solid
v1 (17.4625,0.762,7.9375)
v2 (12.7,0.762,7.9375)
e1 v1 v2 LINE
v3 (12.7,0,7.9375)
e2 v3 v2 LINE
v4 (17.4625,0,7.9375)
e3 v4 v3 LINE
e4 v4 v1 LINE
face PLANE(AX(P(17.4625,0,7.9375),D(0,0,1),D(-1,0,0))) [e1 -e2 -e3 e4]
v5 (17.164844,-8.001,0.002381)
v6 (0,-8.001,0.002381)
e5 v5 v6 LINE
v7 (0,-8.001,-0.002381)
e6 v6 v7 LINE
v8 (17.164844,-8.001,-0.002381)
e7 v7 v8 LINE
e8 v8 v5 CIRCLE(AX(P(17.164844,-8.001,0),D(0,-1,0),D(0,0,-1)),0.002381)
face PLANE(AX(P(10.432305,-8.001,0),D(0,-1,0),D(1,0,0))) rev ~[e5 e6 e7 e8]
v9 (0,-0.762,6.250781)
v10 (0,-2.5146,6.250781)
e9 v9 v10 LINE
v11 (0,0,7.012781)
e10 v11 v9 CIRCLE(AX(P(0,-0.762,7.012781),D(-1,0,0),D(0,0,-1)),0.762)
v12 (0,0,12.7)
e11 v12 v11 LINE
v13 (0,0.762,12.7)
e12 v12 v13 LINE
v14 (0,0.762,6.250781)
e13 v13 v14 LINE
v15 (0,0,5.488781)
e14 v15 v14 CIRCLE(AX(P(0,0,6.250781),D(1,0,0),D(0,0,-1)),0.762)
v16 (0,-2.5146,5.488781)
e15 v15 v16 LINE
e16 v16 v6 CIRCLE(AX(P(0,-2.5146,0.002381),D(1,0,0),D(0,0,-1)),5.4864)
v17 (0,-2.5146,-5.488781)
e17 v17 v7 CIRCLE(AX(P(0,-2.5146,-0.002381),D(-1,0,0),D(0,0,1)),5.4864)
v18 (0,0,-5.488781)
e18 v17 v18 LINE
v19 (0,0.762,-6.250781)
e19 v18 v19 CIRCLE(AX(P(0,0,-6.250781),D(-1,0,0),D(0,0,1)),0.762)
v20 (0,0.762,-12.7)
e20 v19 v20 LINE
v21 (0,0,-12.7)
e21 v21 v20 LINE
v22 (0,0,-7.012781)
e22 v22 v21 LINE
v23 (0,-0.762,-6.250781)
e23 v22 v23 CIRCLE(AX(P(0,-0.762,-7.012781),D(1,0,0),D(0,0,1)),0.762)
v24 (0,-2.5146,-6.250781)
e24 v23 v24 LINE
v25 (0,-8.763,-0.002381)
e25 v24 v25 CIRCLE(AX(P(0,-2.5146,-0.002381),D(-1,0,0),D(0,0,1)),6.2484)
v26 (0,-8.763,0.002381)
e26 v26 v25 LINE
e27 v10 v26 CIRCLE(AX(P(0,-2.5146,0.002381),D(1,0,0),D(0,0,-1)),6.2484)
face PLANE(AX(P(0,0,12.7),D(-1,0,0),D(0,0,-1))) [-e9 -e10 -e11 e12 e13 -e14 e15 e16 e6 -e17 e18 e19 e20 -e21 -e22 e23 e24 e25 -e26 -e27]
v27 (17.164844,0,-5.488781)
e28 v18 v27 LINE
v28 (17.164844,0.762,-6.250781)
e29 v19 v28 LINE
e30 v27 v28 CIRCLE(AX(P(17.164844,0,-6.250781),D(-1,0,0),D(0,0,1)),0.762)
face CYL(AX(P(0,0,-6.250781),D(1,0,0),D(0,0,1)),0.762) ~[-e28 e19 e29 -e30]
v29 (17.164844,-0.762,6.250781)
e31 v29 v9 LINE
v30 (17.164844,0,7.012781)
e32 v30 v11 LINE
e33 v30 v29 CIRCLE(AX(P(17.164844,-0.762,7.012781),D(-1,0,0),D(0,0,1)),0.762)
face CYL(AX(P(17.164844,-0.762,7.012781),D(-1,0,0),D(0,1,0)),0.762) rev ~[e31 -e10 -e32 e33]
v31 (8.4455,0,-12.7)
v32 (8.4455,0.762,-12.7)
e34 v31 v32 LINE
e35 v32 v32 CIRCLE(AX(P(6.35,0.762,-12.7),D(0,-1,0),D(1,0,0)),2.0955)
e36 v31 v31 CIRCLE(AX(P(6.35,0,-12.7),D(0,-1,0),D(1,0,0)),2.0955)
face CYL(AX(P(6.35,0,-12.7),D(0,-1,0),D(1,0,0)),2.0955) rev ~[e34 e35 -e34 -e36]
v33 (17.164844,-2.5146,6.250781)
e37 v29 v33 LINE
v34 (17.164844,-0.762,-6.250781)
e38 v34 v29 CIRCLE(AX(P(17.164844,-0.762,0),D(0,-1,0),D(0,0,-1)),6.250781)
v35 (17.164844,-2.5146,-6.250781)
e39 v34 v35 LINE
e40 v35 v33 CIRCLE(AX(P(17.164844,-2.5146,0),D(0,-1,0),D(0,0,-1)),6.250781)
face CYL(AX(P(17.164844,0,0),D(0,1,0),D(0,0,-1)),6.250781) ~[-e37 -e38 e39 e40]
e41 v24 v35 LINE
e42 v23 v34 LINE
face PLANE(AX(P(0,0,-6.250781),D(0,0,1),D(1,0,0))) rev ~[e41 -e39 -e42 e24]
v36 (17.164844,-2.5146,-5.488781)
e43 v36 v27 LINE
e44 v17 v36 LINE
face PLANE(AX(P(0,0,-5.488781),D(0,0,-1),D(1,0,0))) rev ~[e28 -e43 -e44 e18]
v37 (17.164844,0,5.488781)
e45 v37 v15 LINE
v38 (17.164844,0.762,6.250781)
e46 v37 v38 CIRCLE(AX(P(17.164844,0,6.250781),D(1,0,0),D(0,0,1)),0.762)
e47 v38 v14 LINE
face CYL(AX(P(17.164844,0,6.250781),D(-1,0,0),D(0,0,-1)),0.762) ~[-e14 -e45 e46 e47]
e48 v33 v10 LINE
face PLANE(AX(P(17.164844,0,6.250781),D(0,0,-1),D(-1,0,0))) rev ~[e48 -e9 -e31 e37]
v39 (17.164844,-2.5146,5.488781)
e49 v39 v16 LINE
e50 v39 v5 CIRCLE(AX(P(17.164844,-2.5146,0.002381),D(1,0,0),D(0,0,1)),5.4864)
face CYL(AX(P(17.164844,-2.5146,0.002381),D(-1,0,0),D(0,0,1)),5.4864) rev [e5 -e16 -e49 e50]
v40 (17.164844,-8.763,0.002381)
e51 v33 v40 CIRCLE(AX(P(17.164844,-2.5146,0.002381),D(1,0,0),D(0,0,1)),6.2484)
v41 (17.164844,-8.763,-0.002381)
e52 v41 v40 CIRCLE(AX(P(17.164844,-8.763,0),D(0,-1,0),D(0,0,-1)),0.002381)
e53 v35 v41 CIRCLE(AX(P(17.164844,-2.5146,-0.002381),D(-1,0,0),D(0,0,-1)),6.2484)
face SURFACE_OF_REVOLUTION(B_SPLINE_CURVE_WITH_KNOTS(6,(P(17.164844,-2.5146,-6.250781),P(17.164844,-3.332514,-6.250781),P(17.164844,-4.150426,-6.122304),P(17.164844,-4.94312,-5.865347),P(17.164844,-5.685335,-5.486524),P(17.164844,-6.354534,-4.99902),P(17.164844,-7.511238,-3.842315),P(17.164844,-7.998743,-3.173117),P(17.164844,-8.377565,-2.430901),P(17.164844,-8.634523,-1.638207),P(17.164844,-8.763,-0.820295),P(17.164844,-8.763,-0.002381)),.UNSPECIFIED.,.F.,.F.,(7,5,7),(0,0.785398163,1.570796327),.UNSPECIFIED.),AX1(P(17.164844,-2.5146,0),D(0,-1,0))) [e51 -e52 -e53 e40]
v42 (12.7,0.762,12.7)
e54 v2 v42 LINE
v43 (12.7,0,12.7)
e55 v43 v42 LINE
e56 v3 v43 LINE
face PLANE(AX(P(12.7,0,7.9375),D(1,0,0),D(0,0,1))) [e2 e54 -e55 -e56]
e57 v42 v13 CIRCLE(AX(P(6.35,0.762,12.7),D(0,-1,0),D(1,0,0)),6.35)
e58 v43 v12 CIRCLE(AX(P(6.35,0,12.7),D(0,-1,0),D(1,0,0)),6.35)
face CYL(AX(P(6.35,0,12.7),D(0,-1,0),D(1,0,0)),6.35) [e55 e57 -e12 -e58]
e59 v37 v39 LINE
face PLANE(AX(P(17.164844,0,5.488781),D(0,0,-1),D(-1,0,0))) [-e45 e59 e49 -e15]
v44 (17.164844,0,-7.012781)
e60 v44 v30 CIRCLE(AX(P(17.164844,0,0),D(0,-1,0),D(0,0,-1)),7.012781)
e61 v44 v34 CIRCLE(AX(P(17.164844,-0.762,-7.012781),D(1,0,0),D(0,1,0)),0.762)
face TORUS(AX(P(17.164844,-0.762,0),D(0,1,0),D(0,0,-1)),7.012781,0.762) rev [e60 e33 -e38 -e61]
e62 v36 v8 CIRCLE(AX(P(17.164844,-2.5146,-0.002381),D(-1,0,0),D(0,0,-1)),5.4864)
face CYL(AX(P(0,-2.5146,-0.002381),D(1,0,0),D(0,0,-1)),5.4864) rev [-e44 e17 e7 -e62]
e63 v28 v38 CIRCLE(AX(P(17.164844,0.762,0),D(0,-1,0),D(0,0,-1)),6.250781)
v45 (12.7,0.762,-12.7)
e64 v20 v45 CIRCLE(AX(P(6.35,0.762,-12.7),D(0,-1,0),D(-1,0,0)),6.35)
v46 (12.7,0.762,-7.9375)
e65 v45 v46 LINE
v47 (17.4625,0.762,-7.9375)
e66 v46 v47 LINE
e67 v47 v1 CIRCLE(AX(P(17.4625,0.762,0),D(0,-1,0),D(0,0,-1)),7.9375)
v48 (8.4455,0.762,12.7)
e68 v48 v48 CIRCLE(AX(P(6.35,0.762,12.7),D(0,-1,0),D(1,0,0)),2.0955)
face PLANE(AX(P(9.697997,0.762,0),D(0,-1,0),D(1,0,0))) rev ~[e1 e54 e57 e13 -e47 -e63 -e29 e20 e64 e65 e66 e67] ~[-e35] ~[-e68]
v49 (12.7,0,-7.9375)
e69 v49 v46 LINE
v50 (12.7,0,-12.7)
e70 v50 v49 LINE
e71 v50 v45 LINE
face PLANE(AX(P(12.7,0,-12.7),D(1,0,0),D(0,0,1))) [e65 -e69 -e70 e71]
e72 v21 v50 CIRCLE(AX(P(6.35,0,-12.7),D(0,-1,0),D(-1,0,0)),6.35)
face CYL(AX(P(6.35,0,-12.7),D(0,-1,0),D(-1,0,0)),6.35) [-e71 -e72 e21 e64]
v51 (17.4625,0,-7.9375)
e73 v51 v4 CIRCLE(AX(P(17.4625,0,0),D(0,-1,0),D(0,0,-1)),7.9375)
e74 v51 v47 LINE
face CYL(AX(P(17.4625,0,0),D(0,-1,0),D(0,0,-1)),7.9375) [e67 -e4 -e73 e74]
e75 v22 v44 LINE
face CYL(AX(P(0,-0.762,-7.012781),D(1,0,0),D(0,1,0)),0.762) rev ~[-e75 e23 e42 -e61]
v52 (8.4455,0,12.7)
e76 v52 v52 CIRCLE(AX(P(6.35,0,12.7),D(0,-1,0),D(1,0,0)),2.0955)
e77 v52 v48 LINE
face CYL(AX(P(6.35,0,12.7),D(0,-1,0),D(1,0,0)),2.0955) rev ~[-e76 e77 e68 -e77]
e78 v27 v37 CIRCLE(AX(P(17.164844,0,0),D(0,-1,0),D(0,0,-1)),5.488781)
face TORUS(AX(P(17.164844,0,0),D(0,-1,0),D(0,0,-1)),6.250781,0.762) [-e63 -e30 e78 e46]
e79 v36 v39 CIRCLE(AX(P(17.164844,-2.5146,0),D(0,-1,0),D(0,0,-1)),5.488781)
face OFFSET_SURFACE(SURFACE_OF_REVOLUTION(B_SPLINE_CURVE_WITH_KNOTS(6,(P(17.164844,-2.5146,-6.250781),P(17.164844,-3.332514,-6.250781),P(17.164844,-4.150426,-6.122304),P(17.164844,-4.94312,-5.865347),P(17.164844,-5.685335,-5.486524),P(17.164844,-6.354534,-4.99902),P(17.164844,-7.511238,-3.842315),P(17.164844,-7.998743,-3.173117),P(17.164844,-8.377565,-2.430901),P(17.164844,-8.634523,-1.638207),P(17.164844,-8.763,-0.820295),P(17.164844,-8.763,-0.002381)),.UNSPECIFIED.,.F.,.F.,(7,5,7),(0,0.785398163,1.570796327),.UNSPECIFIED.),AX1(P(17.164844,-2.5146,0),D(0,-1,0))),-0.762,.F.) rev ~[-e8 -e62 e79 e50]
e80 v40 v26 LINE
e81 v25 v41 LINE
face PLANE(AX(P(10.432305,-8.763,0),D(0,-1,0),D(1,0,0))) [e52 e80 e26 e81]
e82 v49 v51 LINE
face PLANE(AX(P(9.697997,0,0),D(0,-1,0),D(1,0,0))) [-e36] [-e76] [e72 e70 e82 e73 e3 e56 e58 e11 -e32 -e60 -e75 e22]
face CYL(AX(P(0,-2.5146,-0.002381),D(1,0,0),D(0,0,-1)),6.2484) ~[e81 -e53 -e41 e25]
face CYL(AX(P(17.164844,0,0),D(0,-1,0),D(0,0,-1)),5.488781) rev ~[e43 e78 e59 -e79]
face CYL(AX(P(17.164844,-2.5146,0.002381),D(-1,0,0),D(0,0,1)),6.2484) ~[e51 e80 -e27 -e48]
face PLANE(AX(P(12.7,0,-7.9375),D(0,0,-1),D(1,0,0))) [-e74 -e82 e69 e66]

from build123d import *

# Parameters (mm, degrees)
F1_DEPTH    = 0.762
F3_DEPTH    = 8.763
F4_R        = 6.2484
F5_R        = 2.0955
F6_DEPTH    = 0.763
F7_T        = 0.762
F7_T3_DEPTH = 18.68884375
F7_T5_DEPTH = 2.286
F7_T8_ANGLE = 180.000000001
F8_DEPTH    = 0.763
F9_R        = 0.762


# Not quite as in the source:
# - a shell that OpenCascade refuses in one call is made with other operations: the cavity is built on its own and cut out


with BuildPart() as f1:
    # F0 (on Front) → F1 (new body)
    with BuildSketch(Plane.XZ):
        with BuildLine():
            ThreePointArc((12.7, 12.7), (6.35, 19.05), (0, 12.7))
            Line((0, 12.7), (0, -12.7))
            ThreePointArc((0, -12.7), (6.35, -19.05), (12.7, -12.7))
            Line((12.7, -12.7), (12.7, -7.9375))
            Line((12.7, -7.9375), (17.4625, -7.9375))
            ThreePointArc((17.4625, -7.9375), (25.4, 0), (17.4625, 7.9375))
            Line((17.4625, 7.9375), (12.7, 7.9375))
            Line((12.7, 7.9375), (12.7, 12.7))
        make_face()
    extrude(amount=-F1_DEPTH)

    # F2 (on face) → F3 (join)
    with BuildSketch(Plane.XZ):
        with BuildLine():
            Line((17.16484375, 6.25078125), (0, 6.25078125))
            Line((0, 6.25078125), (0, -6.25078125))
            Line((0, -6.25078125), (17.16484375, -6.25078125))
            ThreePointArc((17.16484375, -6.25078125), (23.415625, 0), (17.16484375, 6.25078125))
        make_face()
    extrude(amount=F3_DEPTH)

    # F4
    f4_edges = [f1.edges().sort_by_distance(p)[0] for p in [
        (8.582422, -8.763, 6.250781),
    ]]
    fillet(f4_edges, radius=F4_R)

    # F5 (on face) → F6 (cut, through all)
    with BuildSketch(Plane.XZ):
        with Locations((6.35, 12.7)):
            Circle(F5_R)
        with Locations((6.35, -12.7)):
            Circle(F5_R)
    extrude(amount=-F6_DEPTH, mode=Mode.SUBTRACT)

    # F7: shell of thickness 0.762, made by hand


with BuildPart() as f7_core1:
    # F7_t2: copy of F1
    add(f1.part)

    # the walls: a layer under each face that stays
    f7_faces = [f7_core1.faces().sort_by_distance(p)[0] for p in [
        (8.582421875, -1.2573, -6.25078125),
        (8.582421875, -6.9328860116, -4.4206672616),
        (4.2333333333, 0, -12.7),
        (8.5836125, -8.763, 0),
        (6.35, 0.381, -19.05),
        (8.582421875, -6.9328860116, 4.4206672616),
        (12.7, 0.762, 0),
        (8.582421875, -1.2573, 6.25078125),
        (6.35, 0.381, 19.05),
        (23.415625, -1.2573, 0),
        (21.5855110116, -6.9328860116, 0),
        (12.7, 0.381, -10.31875),
        (15.08125, 0.381, -7.9375),
        (25.4, 0.381, 0),
        (15.08125, 0.381, 7.9375),
        (12.7, 0.381, 10.31875),
        (4.2545, 0.381, -12.7),
        (4.2545, 0.381, 12.7),
    ]]
    thicken(f7_faces, amount=-F7_T, mode=Mode.SUBTRACT)

    # F7_s4 → F7_t3 (cut)
    with BuildSketch(Plane.YZ.offset(-0.762)):
        Polygon((-0.00762, -6.25840125), (0, -5.48878125), (0.762, -5.48878125), (0.762, -6.25078125), align=None)
        Polygon((-0.00762, 6.25840125), (0.762, 6.25078125), (0.762, 5.48878125), (0, 5.48878125), align=None)
    extrude(amount=F7_T3_DEPTH, mode=Mode.SUBTRACT)

    # F7_s6 → F7_t5 (cut)
    with BuildSketch(Plane.XZ.offset(-1.524)):
        Polygon((12.70762, -7.94512), (11.938, -7.9375), (11.938, -7.1755), (12.7, -7.1755), align=None)
        Polygon((12.70762, 7.94512), (12.7, 7.1755), (11.938, 7.1755), (11.938, 7.9375), align=None)
    extrude(amount=F7_T5_DEPTH, mode=Mode.SUBTRACT)

    # F7_s7 → F7_t8 (revolve, cut)
    with BuildSketch(Plane.YZ.offset(17.16484375)):
        Polygon((-0.00762, -6.25840125), (0.762, -6.25078125), (0.762, -5.48878125), (0, -5.48878125), align=None)
    revolve(axis=Axis((17.16484375, 0, 0), (0, -1, 0)), revolution_arc=F7_T8_ANGLE, mode=Mode.SUBTRACT)


with BuildPart() as f1_1:
    add(f1.part)

    # what is left inside the walls is the cavity
    f7_cavity = [f7_core1.part.solids().sort_by_distance(p)[0] for p in [
        (11.326812, -0.00762, -1.829594),
    ]]
    add(f7_cavity, mode=Mode.SUBTRACT)

    # F8 (cut, through all): a face of the model
    f8_faces = [f1_1.faces().sort_by_distance(p)[0] for p in [
        (10.7728031168, 0, 0),
    ]]
    extrude(f8_faces, amount=-F8_DEPTH, mode=Mode.SUBTRACT)

    # F9
    f9_edges = [f1_1.edges().sort_by_distance(p)[0] for p in [
        (8.582422, 0, 6.250781),
        (8.582422, 0.762, 5.488781),
    ]]
    fillet(f9_edges, radius=F9_R)


solid = f1_1.part
